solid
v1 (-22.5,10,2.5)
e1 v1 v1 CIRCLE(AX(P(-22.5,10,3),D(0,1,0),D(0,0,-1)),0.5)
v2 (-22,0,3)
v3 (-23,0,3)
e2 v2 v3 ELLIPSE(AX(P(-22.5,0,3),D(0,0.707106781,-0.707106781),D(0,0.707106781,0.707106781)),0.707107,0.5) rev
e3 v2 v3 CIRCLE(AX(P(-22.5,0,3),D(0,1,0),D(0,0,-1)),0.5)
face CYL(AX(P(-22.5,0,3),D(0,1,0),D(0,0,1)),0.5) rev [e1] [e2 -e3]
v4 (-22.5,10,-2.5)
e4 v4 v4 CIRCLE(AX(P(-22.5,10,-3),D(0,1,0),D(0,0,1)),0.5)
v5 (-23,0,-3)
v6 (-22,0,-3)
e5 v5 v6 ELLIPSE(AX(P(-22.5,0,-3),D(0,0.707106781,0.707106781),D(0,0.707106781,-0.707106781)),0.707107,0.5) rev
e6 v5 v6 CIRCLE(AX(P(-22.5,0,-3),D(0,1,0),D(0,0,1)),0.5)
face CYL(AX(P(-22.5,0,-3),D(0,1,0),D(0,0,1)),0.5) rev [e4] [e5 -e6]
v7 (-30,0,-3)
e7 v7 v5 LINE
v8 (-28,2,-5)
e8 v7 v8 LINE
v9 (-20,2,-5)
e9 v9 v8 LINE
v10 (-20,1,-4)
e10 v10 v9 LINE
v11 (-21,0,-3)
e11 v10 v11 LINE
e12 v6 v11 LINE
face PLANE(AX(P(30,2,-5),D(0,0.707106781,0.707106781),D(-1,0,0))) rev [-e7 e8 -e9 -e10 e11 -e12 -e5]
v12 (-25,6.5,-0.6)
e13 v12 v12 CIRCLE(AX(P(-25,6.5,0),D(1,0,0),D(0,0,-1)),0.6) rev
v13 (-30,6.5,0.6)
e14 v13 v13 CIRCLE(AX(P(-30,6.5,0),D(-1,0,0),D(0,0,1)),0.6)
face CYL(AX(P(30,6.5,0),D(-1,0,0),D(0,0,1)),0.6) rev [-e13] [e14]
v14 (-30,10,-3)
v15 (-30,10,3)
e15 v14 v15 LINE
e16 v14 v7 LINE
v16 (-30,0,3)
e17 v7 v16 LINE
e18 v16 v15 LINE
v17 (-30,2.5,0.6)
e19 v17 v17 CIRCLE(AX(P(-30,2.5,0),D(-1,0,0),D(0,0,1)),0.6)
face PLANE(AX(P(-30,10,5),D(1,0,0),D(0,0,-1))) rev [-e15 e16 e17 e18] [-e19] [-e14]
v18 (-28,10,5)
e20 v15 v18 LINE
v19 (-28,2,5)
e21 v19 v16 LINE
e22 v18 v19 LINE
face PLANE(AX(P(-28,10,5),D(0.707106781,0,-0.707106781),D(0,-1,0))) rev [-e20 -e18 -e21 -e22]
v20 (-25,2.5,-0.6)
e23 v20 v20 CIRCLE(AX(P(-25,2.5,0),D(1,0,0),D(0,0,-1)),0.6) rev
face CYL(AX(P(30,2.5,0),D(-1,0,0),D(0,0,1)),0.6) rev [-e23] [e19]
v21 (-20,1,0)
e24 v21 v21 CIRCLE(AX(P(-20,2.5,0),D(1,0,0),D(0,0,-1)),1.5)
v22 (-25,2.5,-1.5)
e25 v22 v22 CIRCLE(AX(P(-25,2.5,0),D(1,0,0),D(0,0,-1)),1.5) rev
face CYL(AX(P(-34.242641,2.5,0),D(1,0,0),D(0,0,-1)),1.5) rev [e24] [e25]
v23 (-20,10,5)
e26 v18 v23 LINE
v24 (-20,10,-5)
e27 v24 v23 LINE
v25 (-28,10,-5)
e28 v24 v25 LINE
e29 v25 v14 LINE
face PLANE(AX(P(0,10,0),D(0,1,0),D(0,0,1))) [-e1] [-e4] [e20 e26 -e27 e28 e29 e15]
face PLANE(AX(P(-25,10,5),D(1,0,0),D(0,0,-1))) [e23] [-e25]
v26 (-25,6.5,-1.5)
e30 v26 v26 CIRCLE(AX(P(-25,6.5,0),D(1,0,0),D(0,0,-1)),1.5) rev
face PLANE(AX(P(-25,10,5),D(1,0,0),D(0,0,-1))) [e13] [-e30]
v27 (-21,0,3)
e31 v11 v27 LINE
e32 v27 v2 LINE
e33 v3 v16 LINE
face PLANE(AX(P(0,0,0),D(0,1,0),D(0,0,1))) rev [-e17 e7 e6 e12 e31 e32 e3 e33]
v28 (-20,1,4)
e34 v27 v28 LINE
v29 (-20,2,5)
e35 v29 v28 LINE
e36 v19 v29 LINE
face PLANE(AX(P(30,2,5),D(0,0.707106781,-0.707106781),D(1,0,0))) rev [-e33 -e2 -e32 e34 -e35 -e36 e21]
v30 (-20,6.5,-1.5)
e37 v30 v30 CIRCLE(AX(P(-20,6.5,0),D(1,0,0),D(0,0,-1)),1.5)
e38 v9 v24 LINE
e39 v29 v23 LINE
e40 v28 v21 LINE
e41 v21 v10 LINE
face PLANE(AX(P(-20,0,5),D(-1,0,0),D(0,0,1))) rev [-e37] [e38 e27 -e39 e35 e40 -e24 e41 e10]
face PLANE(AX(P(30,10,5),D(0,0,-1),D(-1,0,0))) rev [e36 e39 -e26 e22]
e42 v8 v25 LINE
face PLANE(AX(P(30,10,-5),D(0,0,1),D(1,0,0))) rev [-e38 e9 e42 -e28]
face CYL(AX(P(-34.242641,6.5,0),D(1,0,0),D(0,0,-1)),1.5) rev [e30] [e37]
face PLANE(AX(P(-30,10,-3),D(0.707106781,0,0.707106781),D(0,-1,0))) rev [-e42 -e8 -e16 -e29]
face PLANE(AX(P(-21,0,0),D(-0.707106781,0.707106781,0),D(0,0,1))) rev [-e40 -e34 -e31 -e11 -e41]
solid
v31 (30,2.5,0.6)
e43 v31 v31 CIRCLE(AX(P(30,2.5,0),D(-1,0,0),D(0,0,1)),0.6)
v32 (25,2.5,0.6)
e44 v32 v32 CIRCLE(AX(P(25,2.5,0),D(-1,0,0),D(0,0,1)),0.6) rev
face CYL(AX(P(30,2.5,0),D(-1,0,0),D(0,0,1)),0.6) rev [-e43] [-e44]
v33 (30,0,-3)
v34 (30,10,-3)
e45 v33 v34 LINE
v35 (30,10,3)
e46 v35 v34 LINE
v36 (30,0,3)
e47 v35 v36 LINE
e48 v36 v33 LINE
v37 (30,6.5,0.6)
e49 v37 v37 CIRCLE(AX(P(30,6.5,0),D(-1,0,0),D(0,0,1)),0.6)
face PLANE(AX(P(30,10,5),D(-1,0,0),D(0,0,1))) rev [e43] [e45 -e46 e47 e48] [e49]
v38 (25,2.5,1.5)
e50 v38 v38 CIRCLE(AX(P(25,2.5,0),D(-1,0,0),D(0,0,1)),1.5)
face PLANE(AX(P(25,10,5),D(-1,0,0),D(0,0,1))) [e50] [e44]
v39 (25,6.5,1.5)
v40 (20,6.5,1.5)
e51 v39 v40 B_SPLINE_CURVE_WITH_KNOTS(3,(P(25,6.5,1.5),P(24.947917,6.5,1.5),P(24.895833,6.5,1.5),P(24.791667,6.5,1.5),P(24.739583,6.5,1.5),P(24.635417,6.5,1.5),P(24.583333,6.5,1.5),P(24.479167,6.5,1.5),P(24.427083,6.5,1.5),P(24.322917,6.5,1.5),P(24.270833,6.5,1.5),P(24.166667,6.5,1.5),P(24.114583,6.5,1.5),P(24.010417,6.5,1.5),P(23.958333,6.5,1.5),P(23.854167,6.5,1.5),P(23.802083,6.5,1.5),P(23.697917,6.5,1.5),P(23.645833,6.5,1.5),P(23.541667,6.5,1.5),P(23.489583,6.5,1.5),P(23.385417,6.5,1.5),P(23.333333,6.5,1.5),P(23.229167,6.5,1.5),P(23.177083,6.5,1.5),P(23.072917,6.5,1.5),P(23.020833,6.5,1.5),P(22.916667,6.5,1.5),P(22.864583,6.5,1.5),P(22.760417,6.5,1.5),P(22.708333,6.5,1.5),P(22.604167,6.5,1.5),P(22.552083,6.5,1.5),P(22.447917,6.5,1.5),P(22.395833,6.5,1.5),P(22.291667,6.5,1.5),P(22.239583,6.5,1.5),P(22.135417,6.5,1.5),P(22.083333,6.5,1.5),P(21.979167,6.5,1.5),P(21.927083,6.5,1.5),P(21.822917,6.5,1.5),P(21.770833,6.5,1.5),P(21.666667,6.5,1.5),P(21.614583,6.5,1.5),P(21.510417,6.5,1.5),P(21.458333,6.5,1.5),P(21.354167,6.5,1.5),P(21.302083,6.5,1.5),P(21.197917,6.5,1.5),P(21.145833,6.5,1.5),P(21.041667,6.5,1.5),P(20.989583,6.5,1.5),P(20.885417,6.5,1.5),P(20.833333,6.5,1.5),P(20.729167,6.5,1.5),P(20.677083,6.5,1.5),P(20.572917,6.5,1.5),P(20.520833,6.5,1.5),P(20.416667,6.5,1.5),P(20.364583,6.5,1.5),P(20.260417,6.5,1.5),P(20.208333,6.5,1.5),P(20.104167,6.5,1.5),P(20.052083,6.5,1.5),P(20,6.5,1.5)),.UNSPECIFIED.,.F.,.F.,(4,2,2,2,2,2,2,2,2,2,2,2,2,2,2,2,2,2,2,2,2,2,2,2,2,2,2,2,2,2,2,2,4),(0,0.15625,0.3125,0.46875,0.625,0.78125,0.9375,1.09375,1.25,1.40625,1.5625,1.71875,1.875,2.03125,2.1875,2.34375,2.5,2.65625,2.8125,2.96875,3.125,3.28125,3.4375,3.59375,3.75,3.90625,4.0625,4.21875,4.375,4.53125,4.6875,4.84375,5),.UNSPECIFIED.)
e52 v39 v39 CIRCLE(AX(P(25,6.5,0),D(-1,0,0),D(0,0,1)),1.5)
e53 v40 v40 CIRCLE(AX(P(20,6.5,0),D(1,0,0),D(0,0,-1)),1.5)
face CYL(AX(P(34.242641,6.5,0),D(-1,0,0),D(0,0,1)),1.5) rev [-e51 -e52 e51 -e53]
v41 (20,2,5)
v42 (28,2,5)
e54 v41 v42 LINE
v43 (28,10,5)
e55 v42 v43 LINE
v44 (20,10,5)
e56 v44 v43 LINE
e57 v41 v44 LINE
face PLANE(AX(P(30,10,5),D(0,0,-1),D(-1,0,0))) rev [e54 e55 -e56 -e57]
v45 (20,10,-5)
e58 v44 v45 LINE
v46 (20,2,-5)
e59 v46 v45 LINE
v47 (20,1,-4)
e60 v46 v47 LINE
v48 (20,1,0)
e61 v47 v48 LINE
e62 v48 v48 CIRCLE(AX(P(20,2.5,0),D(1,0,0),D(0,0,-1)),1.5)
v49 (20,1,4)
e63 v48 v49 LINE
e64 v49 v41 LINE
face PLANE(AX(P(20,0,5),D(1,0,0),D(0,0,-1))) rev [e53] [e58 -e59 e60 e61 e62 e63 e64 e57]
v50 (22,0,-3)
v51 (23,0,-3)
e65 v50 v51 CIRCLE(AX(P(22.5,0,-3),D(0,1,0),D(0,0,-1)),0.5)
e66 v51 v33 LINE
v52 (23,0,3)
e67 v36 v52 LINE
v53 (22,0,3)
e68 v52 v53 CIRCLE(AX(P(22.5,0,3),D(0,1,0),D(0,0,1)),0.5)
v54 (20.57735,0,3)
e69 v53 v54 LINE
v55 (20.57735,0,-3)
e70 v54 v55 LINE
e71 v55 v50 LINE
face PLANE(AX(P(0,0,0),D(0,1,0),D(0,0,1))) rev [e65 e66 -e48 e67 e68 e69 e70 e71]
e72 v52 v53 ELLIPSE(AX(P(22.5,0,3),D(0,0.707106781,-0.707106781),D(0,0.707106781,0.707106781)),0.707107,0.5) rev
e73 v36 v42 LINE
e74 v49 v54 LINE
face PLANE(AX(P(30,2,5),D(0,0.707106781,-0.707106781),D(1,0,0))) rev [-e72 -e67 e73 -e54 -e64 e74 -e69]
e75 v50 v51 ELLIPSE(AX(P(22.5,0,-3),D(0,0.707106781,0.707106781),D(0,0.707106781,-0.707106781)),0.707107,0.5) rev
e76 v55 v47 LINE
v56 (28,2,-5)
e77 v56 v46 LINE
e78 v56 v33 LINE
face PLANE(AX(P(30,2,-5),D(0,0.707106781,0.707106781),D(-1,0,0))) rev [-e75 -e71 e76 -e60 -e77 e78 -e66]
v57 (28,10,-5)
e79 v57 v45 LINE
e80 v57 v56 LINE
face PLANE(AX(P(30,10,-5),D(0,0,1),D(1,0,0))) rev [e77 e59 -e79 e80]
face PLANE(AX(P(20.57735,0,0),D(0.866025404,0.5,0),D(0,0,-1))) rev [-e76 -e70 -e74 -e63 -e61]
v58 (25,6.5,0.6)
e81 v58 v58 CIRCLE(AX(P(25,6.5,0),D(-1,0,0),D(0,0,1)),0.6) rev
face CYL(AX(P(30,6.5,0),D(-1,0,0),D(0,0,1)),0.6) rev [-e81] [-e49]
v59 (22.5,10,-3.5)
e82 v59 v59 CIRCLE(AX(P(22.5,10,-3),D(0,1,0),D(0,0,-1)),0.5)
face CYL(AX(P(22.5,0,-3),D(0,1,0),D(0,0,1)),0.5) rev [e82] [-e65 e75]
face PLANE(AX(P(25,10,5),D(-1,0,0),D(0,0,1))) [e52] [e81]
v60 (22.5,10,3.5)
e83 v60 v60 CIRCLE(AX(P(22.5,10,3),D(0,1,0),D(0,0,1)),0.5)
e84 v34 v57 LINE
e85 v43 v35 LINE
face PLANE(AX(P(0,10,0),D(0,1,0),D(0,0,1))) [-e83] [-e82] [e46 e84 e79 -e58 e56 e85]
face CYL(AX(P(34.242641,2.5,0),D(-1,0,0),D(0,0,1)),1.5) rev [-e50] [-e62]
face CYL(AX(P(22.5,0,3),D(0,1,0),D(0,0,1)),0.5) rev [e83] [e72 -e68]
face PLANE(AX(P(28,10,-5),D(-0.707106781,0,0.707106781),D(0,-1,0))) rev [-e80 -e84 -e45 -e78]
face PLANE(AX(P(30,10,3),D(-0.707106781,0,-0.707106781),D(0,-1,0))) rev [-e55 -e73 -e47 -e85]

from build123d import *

# Parameters (mm, degrees)
SKETCH_1_W          = 60
SKETCH_1_H          = 10
EXTRUDE_1_DEPTH     = 10
SKETCH_2_R          = 0.6
CUT_EXTRUDE_1_DEPTH = 62.032778079
SKETCH_5_R          = 0.5
CUT_EXTRUDE_3_DEPTH = 33.015621187
CHAMFER_2_SIZE      = 2
CHAMFER_3_SIZE      = 2
SKETCH_6_W          = 40
SKETCH_6_H          = 10
CUT_EXTRUDE_4_DEPTH = 33.015621187
CHAMFER_6_SIZE      = 1
CHAMFER_7_SIZE      = 1
CHAMFER_7_SIZE2     = 0.577350269
SKETCH_7_R          = 1.5
CUT_EXTRUDE_6_DEPTH = 5
SKETCH_8_R          = 1.5
CUT_EXTRUDE_9_DEPTH = 5


with BuildPart() as part:
    # 草图1 → 凸台-拉伸1 (new body)
    with BuildSketch(Plane(origin=(0, 0, 0), x_dir=(1, 0, 0), z_dir=(0, 1, 0))):
        Rectangle(SKETCH_1_W, SKETCH_1_H)
    extrude(amount=EXTRUDE_1_DEPTH)

    # 草图2 → 切除-拉伸1 (cut, through all)
    with BuildSketch(Plane.ZY.offset(30)):
        with Locations((0, 6.5)):
            Circle(SKETCH_2_R)
        with Locations((0, 2.5)):
            Circle(SKETCH_2_R)
    extrude(amount=-CUT_EXTRUDE_1_DEPTH, mode=Mode.SUBTRACT)

    # 草图5 → 切除-拉伸3 (cut, through all)
    with BuildSketch(Plane(origin=(0, 10, 0), x_dir=(1, 0, 0), z_dir=(0, 1, 0))):
        with Locations(Location((-22.5, 3, 0), (0, 0, 270))):
            Circle(SKETCH_5_R)
        with Locations(Location((-22.5, -3, 0), (0, 0, 90))):
            Circle(SKETCH_5_R)
        with Locations(Location((22.5, -3, 0), (0, 0, 270))):
            Circle(SKETCH_5_R)
        with Locations(Location((22.5, 3, 0), (0, 0, 90))):
            Circle(SKETCH_5_R)
    extrude(amount=-CUT_EXTRUDE_3_DEPTH, mode=Mode.SUBTRACT)

    # 倒角2
    # the kernel refuses this chamfer: 2 mm, written as the material it takes off along each edge
    with BuildSketch(Plane(origin=(-35.143365976, 0, -5), x_dir=(0, -0.027495876610586372, 0.9996219169112968), z_dir=(1, 0, 0))) as chamfer_2_piece_1:
        Polygon((CHAMFER_2_SIZE * 0.999621916911, -CHAMFER_2_SIZE * 0.0274958766106), (-CHAMFER_2_SIZE * 0.0274958766106, -CHAMFER_2_SIZE * 0.999621916911), (0, 0), align=None)
    extrude(amount=70.286731952, mode=Mode.SUBTRACT)
    with BuildSketch(Plane(origin=(35.143365976, 0, 5), x_dir=(0, 0.9996219169112968, 0.027495876610586494), z_dir=(-1, 0, 0))) as chamfer_2_piece_2:
        Polygon((CHAMFER_2_SIZE * 0.999621916911, CHAMFER_2_SIZE * 0.0274958766106), (-CHAMFER_2_SIZE * 0.0274958766106, CHAMFER_2_SIZE * 0.999621916911), (0, 0), align=None)
    extrude(amount=70.286731952, mode=Mode.SUBTRACT)

    # 倒角3
    chamfer_3_edges = [part.edges().sort_by_distance(p)[0] for p in [
        (-30, 6, -5),
        (-30, 6, 5),
        (30, 6, 5),
        (30, 6, -5),
    ]]
    chamfer(chamfer_3_edges, length=CHAMFER_3_SIZE)

    # 草图6 → 切除-拉伸4 (cut, through all)
    with BuildSketch(Plane(origin=(0, 10, 0), x_dir=(1, 0, 0), z_dir=(0, 1, 0))):
        Rectangle(SKETCH_6_W, SKETCH_6_H)
    extrude(amount=-CUT_EXTRUDE_4_DEPTH, mode=Mode.SUBTRACT)


with BuildPart() as cut_extrude_4_piece_1:
    # of the separate pieces the step leaves, piece 1, a body of its own (cut_extrude_4_pieces)
    add(part.part.solids().sort_by_distance((-20, 2, 5))[0])

    # 倒角6
    chamfer_6_edges = [cut_extrude_4_piece_1.edges().sort_by_distance(p)[0] for p in [
        (-20, 0, 0),
    ]]
    chamfer(chamfer_6_edges, length=CHAMFER_6_SIZE)

    # 草图7 → 切除-拉伸6 (cut)
    with BuildSketch(Plane(origin=(-20, 0, 0), x_dir=(0, 0, -1), z_dir=(1, 0, 0))):
        with Locations((0, 6.5)):
            Circle(SKETCH_7_R)
        with Locations((0, 2.5)):
            Circle(SKETCH_7_R)
    extrude(amount=-CUT_EXTRUDE_6_DEPTH, mode=Mode.SUBTRACT)


with BuildPart() as cut_extrude_4_piece_2:
    # of the separate pieces the step leaves, piece 2, a body of its own (cut_extrude_4_pieces)
    add(part.part.solids().sort_by_distance((28, 2, 5))[0])

    # 倒角7
    chamfer_7_edges = [cut_extrude_4_piece_2.edges().sort_by_distance(p)[0] for p in [
        (20, 0, 0),
    ]]
    chamfer_7_side = [cut_extrude_4_piece_2.faces().sort_by_distance(p)[0] for p in [
        (20, 5.196977706, 0),
    ]]
    chamfer(chamfer_7_edges, length=CHAMFER_7_SIZE, length2=CHAMFER_7_SIZE2, reference=chamfer_7_side[0])

    # 草图8 → 切除-拉伸9 (cut)
    with BuildSketch(Plane(origin=(20, 0, 0), x_dir=(0, 0, -1), z_dir=(1, 0, 0))):
        with Locations((0, 6.5)):
            Circle(SKETCH_8_R)
        with Locations((0, 2.5)):
            Circle(SKETCH_8_R)
    extrude(amount=CUT_EXTRUDE_9_DEPTH, mode=Mode.SUBTRACT)


solid = Compound([cut_extrude_4_piece_1.part, cut_extrude_4_piece_2.part])
